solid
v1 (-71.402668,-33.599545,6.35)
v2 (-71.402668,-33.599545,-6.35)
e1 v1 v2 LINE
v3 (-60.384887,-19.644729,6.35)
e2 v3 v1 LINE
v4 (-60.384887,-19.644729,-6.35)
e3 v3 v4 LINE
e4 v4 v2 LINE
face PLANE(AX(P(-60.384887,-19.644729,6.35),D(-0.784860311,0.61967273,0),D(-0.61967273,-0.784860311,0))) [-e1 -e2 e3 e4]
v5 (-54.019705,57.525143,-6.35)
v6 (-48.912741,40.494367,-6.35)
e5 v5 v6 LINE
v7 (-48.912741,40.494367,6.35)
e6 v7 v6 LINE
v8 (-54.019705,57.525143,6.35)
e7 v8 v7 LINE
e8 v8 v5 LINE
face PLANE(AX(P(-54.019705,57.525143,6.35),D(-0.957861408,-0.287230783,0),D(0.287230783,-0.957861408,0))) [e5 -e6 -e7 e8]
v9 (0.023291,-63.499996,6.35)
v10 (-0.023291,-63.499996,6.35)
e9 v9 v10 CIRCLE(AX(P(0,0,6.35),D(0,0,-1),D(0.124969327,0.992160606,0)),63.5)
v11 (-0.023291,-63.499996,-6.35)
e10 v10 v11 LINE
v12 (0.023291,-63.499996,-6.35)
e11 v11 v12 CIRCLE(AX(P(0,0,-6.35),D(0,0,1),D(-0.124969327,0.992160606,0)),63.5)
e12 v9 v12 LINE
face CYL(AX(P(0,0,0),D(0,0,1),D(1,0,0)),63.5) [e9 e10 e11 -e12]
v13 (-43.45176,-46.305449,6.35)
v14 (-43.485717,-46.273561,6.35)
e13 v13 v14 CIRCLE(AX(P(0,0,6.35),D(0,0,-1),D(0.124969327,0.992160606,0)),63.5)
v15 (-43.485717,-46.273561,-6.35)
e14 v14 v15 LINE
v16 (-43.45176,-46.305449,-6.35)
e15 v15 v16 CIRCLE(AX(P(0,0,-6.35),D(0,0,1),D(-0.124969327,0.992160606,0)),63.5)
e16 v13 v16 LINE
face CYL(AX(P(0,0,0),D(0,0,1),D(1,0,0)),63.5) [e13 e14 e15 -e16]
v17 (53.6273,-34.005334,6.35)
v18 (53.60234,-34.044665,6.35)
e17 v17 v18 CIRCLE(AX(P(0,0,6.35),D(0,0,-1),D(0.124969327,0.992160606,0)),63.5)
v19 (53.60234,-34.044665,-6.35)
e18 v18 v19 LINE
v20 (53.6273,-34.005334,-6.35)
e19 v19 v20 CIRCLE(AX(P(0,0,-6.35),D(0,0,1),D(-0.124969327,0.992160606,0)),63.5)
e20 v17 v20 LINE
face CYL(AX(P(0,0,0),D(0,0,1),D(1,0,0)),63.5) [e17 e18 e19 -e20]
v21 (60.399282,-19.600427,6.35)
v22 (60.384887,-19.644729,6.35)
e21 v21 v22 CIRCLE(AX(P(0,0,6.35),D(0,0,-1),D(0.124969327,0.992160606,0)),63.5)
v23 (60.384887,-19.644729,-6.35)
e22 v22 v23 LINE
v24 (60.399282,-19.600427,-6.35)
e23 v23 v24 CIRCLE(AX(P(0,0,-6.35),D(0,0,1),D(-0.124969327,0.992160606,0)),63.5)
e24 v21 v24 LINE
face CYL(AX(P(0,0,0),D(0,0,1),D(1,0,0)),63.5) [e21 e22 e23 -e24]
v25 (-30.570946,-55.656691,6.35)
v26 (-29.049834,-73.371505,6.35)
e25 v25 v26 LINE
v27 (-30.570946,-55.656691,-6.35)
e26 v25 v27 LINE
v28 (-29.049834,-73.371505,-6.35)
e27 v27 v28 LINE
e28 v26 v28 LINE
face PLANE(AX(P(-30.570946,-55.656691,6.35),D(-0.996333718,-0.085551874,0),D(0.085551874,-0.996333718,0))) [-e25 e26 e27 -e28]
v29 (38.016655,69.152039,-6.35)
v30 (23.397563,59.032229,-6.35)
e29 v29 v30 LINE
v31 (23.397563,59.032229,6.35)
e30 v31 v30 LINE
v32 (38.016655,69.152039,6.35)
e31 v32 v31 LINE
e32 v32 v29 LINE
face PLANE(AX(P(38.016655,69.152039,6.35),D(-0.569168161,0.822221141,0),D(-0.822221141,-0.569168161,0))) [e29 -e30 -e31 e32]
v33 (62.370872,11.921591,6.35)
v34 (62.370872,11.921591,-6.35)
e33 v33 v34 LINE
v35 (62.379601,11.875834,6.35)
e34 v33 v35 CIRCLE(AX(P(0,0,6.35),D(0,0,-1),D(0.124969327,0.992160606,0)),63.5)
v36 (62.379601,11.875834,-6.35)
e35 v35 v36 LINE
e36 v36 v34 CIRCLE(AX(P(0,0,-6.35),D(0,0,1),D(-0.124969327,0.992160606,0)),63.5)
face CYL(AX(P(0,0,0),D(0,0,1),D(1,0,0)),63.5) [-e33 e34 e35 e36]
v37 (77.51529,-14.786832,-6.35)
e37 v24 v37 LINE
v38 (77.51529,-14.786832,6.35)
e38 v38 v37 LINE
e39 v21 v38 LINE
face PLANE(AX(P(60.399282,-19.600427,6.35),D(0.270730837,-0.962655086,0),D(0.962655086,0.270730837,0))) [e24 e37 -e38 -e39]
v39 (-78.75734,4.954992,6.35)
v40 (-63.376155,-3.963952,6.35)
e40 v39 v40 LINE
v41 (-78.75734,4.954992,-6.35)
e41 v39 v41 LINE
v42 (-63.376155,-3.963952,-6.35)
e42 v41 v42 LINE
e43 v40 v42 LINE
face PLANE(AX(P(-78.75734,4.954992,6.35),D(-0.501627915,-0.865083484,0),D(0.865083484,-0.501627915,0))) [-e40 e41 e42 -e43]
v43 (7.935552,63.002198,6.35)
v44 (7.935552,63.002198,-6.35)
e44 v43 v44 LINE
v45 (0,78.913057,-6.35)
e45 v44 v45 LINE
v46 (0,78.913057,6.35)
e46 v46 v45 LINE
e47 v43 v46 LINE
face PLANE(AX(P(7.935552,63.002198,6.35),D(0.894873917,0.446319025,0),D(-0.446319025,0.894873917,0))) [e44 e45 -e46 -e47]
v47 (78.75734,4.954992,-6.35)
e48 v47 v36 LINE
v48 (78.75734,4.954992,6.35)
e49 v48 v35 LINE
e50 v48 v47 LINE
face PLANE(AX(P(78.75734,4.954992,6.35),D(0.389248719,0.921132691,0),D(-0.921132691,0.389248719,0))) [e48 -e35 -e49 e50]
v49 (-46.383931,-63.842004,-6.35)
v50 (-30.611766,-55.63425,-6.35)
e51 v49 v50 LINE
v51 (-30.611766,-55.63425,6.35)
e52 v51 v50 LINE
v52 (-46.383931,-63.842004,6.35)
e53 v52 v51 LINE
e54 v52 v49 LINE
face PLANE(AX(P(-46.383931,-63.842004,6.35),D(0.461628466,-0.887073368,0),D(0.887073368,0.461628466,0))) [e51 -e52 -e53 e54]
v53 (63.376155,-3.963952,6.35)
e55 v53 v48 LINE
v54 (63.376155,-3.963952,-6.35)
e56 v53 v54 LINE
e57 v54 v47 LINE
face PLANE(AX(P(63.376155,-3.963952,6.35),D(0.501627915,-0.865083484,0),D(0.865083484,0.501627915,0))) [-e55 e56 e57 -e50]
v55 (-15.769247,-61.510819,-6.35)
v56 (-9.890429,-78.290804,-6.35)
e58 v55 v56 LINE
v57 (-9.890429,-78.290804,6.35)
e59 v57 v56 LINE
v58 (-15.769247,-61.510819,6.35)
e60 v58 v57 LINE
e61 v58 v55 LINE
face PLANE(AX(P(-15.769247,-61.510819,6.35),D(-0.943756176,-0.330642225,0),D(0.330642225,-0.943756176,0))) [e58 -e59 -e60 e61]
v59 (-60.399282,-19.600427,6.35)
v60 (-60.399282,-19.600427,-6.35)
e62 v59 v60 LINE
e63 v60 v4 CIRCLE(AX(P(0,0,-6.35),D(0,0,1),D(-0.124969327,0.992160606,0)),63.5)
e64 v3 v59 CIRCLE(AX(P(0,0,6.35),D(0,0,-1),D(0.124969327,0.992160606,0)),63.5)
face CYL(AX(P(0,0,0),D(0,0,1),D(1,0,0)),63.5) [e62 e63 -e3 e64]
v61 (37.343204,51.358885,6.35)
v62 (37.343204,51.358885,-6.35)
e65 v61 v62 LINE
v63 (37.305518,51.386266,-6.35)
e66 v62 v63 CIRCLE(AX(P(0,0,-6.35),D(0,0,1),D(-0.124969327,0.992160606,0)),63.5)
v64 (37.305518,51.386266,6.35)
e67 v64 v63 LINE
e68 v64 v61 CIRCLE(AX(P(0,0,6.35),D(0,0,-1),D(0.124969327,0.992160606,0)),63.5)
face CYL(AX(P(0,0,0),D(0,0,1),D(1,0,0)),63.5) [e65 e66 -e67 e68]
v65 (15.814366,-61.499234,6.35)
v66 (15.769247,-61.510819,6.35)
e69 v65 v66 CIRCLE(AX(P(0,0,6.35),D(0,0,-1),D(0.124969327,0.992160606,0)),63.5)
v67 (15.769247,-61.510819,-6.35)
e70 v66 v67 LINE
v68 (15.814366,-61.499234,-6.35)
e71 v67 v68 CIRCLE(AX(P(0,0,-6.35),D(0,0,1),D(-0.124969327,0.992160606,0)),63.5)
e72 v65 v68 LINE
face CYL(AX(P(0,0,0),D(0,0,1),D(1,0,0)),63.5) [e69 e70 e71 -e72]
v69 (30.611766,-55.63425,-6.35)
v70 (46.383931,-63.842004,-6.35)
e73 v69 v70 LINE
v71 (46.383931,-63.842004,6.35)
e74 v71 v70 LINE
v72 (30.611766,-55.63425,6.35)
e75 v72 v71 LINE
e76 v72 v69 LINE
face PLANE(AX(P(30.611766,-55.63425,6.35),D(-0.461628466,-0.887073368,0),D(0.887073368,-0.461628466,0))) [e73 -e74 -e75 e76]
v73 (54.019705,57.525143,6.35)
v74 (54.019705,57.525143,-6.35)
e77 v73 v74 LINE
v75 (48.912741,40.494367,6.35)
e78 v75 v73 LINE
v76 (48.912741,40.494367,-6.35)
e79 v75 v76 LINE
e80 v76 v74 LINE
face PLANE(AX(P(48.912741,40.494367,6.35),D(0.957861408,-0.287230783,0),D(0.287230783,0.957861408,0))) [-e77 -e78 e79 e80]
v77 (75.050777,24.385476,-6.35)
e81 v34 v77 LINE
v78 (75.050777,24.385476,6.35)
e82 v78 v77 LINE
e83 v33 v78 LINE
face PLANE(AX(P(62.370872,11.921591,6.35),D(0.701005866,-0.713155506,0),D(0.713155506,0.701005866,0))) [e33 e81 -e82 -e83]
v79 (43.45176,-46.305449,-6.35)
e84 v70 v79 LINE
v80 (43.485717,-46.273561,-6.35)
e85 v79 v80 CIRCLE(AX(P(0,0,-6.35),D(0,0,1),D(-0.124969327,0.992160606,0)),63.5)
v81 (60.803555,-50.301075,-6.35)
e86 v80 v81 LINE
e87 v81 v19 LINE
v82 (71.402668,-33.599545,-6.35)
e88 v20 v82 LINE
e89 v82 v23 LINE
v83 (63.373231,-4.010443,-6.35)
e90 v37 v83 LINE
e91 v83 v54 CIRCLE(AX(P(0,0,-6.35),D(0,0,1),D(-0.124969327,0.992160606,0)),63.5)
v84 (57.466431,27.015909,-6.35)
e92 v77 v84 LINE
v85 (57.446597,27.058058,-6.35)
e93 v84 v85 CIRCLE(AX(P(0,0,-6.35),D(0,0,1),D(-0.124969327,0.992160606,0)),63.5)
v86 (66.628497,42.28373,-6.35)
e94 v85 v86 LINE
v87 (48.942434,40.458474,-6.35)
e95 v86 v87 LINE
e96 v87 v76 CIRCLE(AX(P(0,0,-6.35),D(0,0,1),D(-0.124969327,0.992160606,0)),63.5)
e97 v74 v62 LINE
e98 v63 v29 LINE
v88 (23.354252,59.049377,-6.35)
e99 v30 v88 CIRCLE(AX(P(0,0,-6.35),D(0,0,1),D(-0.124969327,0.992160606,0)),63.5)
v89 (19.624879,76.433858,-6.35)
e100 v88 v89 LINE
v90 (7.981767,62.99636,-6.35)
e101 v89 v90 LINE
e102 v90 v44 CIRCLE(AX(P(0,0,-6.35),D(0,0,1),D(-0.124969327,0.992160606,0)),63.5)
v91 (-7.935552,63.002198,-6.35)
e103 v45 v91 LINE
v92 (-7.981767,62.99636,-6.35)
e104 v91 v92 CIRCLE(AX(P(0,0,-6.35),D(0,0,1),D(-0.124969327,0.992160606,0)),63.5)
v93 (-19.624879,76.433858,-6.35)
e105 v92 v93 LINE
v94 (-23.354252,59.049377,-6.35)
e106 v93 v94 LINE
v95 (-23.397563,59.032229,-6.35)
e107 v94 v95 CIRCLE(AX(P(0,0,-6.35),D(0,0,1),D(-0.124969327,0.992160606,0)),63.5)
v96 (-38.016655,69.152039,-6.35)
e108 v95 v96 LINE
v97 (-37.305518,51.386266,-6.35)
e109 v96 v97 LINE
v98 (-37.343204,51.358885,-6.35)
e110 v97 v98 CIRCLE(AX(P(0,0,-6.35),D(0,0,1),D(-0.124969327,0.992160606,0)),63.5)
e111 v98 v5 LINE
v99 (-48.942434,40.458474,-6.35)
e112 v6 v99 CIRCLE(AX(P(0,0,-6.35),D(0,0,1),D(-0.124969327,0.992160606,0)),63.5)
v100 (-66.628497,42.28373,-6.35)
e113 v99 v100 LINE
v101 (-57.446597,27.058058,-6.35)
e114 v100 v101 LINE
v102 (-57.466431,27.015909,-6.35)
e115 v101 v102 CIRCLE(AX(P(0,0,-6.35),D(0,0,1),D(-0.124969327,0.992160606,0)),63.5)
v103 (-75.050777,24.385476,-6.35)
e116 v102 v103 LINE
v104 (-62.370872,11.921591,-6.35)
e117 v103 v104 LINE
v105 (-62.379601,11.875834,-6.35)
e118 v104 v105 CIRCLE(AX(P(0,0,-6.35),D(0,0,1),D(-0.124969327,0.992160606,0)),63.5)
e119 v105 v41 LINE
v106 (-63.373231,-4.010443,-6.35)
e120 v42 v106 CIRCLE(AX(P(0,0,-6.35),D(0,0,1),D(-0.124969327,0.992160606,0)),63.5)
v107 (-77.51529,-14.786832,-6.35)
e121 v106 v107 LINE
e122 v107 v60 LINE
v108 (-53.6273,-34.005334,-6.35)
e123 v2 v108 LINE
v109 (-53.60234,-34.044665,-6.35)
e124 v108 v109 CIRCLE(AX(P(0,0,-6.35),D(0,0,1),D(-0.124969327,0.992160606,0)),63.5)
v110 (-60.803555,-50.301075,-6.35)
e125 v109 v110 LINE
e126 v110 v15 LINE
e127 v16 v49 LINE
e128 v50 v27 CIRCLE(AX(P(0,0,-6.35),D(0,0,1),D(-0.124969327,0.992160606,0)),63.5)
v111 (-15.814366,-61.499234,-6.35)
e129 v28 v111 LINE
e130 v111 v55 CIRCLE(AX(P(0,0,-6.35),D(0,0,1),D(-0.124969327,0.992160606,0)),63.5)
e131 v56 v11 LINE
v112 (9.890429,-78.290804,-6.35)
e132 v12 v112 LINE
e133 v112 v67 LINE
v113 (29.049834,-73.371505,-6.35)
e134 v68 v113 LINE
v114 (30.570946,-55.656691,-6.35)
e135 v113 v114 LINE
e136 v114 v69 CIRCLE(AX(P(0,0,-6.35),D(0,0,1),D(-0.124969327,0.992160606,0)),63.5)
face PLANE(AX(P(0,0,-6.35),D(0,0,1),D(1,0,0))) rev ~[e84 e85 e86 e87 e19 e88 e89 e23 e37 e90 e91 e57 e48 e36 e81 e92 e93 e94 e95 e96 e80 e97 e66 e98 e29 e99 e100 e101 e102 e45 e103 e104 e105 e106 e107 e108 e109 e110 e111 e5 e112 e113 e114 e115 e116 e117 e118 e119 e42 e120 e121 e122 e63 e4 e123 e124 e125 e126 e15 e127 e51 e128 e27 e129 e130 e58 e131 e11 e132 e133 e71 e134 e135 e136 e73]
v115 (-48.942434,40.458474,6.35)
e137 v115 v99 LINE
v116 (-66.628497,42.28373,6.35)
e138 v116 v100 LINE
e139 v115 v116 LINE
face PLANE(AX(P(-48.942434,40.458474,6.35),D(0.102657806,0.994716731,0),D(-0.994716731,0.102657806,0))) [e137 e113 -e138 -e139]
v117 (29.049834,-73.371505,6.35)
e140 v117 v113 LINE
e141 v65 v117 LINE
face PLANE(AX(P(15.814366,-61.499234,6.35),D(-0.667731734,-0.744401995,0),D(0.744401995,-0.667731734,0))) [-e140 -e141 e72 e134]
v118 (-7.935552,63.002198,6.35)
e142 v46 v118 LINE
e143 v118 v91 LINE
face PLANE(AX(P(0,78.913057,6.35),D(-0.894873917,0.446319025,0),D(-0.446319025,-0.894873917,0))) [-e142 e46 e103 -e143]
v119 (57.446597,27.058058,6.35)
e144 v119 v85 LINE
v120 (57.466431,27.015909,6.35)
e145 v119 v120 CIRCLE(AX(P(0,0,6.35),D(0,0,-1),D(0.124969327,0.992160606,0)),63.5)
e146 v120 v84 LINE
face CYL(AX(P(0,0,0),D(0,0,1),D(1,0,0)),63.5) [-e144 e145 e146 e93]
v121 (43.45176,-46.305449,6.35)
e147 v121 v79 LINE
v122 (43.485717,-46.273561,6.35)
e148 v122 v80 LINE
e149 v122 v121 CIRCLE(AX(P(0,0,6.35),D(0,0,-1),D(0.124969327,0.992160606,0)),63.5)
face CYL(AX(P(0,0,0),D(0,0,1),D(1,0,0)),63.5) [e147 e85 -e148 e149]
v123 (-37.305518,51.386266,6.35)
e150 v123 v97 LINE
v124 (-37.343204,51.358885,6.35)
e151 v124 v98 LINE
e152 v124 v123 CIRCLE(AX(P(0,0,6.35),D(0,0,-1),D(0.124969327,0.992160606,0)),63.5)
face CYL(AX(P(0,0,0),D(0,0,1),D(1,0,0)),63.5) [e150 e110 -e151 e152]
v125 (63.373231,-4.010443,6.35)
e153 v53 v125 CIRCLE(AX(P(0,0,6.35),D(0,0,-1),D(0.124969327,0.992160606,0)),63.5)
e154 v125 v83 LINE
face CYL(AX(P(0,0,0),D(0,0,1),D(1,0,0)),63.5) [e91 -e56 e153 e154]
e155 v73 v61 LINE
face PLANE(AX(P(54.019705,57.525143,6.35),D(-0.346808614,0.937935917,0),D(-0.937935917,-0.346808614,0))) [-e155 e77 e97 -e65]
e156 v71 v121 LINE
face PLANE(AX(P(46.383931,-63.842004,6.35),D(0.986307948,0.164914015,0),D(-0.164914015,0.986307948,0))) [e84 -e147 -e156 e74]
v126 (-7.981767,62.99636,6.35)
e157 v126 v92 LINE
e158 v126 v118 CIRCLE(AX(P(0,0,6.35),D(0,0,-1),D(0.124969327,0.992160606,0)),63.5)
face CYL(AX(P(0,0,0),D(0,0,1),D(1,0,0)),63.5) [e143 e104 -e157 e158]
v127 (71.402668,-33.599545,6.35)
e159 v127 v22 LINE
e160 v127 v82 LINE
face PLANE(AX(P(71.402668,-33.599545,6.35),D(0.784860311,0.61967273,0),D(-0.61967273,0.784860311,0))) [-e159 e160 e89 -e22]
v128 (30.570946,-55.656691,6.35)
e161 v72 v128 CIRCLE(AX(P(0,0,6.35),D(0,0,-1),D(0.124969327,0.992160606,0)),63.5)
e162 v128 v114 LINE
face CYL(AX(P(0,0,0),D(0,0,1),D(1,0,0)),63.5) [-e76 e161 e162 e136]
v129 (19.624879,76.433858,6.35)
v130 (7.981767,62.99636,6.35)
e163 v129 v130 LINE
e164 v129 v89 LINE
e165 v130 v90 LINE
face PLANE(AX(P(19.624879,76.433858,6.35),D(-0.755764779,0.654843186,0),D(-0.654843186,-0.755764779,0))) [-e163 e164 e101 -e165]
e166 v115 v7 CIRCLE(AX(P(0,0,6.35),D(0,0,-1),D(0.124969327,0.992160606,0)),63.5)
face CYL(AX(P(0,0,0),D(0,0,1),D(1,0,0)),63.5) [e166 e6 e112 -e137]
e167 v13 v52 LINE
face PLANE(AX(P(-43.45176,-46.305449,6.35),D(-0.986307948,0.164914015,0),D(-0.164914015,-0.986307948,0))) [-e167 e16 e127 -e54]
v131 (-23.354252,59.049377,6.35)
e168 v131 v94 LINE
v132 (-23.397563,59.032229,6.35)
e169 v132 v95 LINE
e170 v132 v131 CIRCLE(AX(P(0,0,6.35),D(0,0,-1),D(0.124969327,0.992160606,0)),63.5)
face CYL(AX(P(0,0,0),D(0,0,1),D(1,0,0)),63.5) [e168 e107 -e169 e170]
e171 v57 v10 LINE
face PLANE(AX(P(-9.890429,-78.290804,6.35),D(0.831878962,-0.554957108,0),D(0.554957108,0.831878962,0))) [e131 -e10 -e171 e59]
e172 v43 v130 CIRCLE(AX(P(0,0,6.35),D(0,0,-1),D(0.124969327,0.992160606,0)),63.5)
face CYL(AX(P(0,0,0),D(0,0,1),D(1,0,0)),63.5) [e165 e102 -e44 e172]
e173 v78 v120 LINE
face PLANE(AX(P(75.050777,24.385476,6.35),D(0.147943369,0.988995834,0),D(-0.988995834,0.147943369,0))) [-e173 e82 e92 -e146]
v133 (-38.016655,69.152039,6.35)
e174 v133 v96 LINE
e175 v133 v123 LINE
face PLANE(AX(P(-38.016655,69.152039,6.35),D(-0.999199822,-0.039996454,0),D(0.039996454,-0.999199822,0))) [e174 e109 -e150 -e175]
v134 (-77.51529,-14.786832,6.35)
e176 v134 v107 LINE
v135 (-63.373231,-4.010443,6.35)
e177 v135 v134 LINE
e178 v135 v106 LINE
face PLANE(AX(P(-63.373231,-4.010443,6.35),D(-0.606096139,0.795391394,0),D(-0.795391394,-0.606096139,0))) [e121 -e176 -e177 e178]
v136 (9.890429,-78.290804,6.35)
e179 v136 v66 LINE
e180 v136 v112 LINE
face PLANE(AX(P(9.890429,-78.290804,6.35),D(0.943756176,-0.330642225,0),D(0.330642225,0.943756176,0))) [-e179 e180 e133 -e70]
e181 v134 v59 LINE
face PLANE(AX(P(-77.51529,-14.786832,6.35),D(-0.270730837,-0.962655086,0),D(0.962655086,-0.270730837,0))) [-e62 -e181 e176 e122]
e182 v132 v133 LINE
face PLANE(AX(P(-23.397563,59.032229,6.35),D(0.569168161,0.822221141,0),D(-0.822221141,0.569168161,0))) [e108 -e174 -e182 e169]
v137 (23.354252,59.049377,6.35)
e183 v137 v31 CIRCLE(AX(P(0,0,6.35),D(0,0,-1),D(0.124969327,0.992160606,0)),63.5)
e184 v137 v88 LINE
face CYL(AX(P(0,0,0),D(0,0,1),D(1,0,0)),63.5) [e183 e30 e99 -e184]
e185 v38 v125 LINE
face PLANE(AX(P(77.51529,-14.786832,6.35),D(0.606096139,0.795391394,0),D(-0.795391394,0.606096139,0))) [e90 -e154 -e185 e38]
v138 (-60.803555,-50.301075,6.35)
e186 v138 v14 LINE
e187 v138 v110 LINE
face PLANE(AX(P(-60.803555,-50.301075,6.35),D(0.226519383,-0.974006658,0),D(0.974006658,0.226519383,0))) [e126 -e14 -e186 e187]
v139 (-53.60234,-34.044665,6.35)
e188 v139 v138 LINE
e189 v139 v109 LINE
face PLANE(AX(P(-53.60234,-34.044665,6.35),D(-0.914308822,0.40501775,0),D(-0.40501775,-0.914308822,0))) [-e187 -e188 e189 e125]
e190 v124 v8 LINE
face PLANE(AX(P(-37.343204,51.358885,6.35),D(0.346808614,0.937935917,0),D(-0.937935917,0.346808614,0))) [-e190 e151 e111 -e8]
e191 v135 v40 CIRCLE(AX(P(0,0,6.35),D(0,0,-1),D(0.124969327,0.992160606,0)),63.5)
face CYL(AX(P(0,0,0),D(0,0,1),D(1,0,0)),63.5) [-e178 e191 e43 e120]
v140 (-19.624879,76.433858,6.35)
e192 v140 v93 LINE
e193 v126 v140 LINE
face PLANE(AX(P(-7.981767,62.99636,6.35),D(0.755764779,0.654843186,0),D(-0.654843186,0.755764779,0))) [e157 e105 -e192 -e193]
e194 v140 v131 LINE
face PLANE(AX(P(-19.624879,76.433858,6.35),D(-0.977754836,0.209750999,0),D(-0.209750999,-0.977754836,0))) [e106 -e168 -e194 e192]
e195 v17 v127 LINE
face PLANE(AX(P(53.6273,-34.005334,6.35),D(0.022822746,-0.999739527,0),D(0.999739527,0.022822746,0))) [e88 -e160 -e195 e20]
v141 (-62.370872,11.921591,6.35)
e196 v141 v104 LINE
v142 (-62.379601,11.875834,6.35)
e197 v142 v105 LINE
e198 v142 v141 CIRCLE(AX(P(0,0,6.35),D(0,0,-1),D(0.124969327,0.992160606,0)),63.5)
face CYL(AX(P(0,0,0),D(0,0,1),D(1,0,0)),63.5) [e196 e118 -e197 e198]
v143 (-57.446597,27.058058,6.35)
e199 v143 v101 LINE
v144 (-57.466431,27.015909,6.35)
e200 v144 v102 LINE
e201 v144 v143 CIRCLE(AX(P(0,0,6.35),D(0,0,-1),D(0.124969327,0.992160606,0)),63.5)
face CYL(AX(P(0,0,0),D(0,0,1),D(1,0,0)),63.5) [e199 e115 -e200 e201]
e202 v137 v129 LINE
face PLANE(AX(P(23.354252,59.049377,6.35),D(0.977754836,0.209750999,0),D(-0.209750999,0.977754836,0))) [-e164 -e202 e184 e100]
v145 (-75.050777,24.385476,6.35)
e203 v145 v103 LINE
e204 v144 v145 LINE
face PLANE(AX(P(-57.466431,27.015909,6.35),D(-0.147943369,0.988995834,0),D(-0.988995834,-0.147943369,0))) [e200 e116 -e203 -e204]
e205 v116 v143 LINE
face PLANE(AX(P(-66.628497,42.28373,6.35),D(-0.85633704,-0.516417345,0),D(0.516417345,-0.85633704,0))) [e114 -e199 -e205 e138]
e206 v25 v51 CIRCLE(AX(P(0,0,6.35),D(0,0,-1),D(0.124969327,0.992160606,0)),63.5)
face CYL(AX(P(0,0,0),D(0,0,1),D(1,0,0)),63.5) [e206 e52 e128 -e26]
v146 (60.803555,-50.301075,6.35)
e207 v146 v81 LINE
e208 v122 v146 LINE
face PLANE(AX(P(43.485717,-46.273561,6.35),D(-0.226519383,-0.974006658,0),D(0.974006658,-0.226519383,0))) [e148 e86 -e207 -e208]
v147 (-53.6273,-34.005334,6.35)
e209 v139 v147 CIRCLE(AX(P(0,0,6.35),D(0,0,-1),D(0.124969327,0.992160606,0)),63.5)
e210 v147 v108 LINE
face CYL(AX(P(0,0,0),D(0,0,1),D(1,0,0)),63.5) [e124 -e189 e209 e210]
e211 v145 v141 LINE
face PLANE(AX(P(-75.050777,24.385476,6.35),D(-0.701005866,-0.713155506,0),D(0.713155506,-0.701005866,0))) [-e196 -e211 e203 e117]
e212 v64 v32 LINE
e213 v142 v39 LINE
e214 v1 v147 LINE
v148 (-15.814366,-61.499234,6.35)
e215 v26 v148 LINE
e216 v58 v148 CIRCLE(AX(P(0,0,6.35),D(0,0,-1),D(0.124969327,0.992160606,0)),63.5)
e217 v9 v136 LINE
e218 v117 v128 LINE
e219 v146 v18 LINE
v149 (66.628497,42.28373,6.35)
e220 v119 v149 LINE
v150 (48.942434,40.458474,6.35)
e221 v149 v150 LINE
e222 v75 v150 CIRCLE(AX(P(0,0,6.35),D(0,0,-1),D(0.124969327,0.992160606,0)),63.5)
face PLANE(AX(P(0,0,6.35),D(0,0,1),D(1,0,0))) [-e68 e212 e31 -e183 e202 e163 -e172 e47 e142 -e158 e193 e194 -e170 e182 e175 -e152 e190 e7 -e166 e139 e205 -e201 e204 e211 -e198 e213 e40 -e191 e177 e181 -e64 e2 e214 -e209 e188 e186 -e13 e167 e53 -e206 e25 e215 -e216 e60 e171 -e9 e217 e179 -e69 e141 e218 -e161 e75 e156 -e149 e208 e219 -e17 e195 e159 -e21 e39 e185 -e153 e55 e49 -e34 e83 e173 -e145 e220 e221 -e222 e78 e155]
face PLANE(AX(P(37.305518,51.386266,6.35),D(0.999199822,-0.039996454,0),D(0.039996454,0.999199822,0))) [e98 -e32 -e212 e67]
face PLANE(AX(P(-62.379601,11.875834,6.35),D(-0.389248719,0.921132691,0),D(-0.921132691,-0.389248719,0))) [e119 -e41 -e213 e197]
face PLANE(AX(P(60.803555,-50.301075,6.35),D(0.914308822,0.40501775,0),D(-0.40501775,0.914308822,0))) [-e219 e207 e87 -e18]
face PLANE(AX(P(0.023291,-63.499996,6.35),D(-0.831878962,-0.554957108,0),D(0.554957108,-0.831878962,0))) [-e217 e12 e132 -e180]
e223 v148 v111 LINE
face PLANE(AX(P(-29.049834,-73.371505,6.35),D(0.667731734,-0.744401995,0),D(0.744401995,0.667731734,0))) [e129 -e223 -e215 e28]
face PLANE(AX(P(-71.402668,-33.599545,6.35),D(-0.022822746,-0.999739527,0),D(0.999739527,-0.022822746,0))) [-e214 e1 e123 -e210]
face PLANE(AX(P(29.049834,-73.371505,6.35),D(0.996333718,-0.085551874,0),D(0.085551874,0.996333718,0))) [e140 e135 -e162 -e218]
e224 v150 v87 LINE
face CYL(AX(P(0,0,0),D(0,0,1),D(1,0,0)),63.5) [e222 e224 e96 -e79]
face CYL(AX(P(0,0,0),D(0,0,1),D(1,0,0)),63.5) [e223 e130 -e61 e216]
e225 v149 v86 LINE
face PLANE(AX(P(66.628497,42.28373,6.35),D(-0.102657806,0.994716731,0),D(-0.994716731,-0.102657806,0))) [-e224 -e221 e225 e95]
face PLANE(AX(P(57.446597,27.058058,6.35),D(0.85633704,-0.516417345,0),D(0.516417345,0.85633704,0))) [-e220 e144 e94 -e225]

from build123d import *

# Parameters (mm, degrees)
F0_R            = 63.5
F1_DEPTH        = 6.35
F3_DEPTH        = 12.7
F3_COPIES_COUNT = 25


# Not quite as in the source:
# - a pattern or mirror of a feature is missing from the dataset's text; its kind, count and spacing are read off the source's solid


with BuildPart() as f1:
    # F0 (on Top) → F1 (new body, symmetric)
    with BuildSketch(Plane.XY):
        Circle(F0_R)
    extrude(amount=F1_DEPTH, both=True)

    # F2 (on face) → F3 (join, through all)
    with BuildSketch(Plane.XY.offset(6.35)):
        with BuildLine():
            Line((0, 78.9130567023), (-7.9355522703, 63.002198455))
            ThreePointArc((-7.9355522703, 63.002198455), (0, 63.5), (7.9355522703, 63.002198455))
            Line((7.9355522703, 63.002198455), (0, 78.9130567023))
        make_face()
    f3 = extrude(amount=-F3_DEPTH)

    # F3_copies: F3 ×25 about axis
    f3_copies_axis = Axis((0, 0, 0), (0, 0, 1))
    for i in range(1, F3_COPIES_COUNT):
        add(f3.rotate(f3_copies_axis, i * 360 / F3_COPIES_COUNT))


solid = f1.part
